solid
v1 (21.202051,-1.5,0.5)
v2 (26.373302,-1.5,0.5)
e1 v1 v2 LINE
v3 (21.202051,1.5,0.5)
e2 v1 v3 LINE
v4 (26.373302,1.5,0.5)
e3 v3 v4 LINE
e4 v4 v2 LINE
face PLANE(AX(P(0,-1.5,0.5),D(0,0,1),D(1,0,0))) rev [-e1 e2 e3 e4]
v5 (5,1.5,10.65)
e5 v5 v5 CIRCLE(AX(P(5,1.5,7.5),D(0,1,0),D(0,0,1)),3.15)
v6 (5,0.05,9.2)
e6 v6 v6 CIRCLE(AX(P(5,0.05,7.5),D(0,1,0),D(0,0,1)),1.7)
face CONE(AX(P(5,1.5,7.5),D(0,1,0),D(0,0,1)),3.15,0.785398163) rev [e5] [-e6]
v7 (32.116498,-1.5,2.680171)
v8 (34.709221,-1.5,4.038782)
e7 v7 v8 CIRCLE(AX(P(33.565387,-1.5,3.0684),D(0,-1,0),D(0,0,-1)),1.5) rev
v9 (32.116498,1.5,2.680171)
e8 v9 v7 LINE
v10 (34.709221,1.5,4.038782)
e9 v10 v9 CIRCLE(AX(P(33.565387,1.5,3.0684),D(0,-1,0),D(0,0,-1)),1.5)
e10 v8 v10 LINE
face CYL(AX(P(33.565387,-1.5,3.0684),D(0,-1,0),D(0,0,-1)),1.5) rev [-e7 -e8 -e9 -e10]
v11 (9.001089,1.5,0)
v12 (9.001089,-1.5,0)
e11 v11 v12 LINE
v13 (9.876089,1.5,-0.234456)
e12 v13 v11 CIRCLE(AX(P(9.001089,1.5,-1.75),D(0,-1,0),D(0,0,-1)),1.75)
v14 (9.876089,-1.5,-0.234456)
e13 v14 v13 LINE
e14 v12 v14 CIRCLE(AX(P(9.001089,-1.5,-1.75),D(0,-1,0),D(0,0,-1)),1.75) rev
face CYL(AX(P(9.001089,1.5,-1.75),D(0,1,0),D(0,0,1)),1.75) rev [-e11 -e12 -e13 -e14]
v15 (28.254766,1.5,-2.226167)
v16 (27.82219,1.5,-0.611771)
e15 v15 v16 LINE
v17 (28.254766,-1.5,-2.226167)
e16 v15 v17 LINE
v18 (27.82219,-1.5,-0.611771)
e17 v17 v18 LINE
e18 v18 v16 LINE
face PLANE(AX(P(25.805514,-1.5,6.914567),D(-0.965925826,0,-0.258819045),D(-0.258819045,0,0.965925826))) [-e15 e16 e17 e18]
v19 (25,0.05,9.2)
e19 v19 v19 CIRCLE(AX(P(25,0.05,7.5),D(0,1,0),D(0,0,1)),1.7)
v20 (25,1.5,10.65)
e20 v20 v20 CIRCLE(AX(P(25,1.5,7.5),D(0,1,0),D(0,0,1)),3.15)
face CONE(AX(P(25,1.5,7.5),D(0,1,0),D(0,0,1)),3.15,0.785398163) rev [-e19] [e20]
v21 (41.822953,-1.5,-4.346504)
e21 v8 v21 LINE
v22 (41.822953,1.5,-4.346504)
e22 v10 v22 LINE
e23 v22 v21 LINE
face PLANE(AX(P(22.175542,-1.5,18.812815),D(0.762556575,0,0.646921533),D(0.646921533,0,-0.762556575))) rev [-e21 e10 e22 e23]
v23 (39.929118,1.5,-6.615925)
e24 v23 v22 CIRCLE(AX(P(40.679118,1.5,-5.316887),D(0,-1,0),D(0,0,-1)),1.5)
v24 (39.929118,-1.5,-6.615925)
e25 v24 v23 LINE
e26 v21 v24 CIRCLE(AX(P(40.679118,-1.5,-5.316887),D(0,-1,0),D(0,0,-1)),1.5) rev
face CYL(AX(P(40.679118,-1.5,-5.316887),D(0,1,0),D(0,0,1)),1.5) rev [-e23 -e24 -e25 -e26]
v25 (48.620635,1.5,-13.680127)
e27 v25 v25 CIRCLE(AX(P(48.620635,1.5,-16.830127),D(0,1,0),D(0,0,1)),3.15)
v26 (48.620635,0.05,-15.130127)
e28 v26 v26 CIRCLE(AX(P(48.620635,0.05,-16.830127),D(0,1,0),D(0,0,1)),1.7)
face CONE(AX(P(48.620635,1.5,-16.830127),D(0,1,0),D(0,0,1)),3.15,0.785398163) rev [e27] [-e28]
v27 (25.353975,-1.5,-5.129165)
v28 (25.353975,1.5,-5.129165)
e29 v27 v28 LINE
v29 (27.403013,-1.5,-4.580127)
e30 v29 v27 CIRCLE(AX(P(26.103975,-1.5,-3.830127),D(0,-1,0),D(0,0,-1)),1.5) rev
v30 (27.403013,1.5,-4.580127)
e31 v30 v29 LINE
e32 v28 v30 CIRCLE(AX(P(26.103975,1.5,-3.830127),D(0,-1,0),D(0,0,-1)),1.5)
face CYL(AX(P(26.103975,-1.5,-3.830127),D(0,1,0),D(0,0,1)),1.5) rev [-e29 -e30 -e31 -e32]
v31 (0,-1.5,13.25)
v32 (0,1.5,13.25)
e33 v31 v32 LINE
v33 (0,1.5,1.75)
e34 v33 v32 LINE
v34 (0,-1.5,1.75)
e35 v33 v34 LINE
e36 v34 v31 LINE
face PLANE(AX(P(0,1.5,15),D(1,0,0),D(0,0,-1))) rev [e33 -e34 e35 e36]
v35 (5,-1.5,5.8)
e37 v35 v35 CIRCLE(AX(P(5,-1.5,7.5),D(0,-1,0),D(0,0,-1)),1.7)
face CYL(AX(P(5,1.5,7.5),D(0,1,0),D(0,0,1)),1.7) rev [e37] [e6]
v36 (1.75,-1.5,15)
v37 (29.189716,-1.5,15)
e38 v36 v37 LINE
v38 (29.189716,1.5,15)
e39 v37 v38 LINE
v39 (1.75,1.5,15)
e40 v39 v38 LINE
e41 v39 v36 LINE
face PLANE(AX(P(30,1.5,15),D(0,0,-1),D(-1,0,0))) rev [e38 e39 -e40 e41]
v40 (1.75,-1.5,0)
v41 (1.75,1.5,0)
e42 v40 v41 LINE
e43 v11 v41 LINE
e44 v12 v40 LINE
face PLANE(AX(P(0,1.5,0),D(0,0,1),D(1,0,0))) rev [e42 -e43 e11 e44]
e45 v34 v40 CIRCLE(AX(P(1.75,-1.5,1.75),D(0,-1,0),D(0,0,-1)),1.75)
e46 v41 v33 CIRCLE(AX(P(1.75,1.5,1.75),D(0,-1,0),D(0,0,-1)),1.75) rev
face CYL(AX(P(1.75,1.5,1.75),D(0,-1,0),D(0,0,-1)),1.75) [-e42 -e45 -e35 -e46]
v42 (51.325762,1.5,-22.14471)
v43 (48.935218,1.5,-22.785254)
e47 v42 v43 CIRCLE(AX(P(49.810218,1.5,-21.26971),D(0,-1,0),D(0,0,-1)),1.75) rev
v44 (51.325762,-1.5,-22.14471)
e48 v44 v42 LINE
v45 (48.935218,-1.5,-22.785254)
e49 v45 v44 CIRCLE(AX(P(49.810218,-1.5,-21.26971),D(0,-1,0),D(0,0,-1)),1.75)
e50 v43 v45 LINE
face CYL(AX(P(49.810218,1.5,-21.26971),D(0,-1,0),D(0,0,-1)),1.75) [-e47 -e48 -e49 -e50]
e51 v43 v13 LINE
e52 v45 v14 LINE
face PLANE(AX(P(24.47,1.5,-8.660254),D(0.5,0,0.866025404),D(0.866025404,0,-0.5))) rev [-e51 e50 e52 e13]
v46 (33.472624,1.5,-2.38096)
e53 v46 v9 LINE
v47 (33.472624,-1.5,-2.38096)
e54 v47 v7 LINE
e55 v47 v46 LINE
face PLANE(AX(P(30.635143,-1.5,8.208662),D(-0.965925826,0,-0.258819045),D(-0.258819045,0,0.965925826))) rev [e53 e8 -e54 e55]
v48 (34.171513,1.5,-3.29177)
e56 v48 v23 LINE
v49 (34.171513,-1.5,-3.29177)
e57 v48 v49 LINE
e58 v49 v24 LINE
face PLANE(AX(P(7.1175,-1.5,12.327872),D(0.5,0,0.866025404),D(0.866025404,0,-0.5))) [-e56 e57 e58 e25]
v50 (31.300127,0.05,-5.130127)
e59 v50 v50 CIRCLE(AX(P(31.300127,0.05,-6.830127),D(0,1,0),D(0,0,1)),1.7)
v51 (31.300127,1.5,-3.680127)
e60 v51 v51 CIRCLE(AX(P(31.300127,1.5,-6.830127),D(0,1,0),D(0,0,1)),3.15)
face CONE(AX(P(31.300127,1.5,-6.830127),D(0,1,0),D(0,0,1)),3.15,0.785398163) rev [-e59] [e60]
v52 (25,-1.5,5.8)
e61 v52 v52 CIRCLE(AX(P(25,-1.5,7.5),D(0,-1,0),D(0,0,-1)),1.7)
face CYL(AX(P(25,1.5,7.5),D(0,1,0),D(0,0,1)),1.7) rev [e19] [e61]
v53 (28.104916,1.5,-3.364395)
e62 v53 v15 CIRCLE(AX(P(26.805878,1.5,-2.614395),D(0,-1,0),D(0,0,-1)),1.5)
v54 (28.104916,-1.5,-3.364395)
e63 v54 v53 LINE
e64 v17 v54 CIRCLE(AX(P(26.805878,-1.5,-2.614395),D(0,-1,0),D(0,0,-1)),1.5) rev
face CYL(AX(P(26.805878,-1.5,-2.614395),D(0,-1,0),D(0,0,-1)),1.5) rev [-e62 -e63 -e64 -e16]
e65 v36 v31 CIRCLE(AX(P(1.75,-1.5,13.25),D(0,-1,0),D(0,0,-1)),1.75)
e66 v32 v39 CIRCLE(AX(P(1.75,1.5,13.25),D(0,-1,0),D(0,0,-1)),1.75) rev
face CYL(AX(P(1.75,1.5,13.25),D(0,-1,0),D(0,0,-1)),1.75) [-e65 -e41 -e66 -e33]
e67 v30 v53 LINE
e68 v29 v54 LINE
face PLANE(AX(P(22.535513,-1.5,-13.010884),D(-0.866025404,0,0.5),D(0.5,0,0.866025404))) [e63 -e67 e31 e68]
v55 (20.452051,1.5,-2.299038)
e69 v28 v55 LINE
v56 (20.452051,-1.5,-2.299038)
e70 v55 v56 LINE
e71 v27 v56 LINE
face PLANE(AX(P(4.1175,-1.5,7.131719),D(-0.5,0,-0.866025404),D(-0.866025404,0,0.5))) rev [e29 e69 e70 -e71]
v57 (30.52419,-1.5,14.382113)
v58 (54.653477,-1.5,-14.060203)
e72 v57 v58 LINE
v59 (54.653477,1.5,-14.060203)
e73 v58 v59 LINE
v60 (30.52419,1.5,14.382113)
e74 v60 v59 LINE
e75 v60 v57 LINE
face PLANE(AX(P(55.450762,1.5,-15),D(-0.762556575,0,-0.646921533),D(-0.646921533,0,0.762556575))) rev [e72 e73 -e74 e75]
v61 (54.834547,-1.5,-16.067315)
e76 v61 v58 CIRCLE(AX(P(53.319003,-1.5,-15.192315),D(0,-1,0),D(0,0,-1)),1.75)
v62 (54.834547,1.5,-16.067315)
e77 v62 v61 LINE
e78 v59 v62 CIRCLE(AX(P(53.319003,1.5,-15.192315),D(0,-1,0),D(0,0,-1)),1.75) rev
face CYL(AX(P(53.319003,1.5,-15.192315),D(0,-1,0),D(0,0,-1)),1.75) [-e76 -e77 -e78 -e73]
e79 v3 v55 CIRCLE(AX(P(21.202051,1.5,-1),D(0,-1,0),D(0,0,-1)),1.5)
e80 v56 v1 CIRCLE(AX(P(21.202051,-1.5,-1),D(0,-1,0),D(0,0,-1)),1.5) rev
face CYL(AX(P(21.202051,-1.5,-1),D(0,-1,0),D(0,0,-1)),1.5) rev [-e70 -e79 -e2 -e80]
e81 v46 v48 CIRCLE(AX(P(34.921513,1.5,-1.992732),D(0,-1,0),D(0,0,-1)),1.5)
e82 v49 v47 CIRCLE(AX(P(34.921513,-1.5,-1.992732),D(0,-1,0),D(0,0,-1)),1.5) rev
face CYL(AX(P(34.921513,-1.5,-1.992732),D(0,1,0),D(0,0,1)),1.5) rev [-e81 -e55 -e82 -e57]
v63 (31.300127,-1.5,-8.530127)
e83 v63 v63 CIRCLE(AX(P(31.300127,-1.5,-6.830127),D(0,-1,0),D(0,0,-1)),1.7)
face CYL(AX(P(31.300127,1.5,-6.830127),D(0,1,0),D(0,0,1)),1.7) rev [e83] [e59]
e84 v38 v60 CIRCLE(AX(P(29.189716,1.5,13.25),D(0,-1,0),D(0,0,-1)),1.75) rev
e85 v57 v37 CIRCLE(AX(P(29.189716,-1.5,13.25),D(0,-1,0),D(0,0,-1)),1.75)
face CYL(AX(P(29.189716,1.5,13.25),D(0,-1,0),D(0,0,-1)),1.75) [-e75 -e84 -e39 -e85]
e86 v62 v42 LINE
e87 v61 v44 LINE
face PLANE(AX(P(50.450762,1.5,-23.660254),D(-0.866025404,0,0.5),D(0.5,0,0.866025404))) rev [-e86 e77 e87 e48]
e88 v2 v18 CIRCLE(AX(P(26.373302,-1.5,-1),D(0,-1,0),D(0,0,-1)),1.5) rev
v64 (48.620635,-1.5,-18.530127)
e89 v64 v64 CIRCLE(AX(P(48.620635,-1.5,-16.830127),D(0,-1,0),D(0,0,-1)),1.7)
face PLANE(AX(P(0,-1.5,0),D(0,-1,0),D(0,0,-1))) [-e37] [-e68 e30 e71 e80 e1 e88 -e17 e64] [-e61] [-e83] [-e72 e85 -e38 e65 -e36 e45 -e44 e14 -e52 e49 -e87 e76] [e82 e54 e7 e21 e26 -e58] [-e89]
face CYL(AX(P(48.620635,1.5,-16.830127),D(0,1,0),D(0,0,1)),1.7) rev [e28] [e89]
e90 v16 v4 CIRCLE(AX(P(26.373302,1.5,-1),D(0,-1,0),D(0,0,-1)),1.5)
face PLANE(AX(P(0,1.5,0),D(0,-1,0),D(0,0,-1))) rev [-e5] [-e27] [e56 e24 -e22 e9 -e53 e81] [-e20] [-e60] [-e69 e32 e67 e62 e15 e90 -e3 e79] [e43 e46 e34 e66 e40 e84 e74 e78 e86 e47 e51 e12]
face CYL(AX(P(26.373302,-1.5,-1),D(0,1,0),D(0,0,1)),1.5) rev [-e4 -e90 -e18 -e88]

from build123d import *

# Parameters (mm, degrees)
SKETCH_2_R                   = 1.6
EXTRUDE_1_DEPTH              = 1.5
CUT_EXTRUDE_1_DEPTH          = 3
FILLET_1_R                   = 1
FILLET_2_R                   = 1.75
HOLE_WIZARD_M3_1_D           = 3.4
HOLE_WIZARD_M3_1_DEPTH       = 18.978536948
HOLE_WIZARD_M3_1_CSINK_D     = 6.3
HOLE_WIZARD_M3_1_CSINK_ANGLE = 90
HOLE_WIZARD_M3_1_TIP         = 1.021463052
MOVE_START                   = -1.5
MOVE_FACE_1_DEPTH            = 3


# Read off the part's stored shape, not the designer's step: 面の移動1
with BuildPart() as part:
    # ｽｹｯﾁ2 → ﾎﾞｽ - 押し出し1 (new, symmetric)
    with BuildSketch(Plane(origin=(0, 0, 0), x_dir=(1, 0, 0), z_dir=(0, 1, 0))):
        Polygon((24.47, 8.660254038), (9.47, 0), (0, 0), (0, -15), (30, -15), (55.450762114, 15), (50.450762114, 23.660254038), align=None)
        with Locations(Location((48.620635095, 16.830127019, 0), (0, 0, 270))):
            Circle(SKETCH_2_R, mode=Mode.SUBTRACT)
        with Locations(Location((25, -7.5, 0), (0, 0, 270))):
            Circle(SKETCH_2_R, mode=Mode.SUBTRACT)
        with Locations(Location((31.300127019, 6.830127019, 0), (0, 0, 270))):
            Circle(SKETCH_2_R, mode=Mode.SUBTRACT)
        with Locations(Location((5, -7.5, 0), (0, 0, 270))):
            Circle(SKETCH_2_R, mode=Mode.SUBTRACT)
    extrude(amount=EXTRUDE_1_DEPTH, both=True)

    # ｽｹｯﾁ3 → ｶｯﾄ - 押し出し1 (cut)
    with BuildSketch(Plane(origin=(0, 1.5, 0), x_dir=(1, 0, 0), z_dir=(0, 1, 0))):
        Polygon((26.47, 5.196152423), (17.47, 0), (27.140628594, 0), (27.879009742, 2.755675961), align=None)
        Polygon((33.352285677, 0), (37.479868618, 0), (45.169472556, 9.064094706), (34.062793268, 2.651650429), align=None)
        Polygon((31.44676478, -7.111500799), (37.479868618, 0), (33.352285677, 0), align=None)
    extrude(amount=-CUT_EXTRUDE_1_DEPTH, mode=Mode.SUBTRACT)

    # ﾌｨﾚｯﾄ1
    fillet_1_edges = [part.edges().sort_by_distance(p)[0] for p in [
        (27.879009742, 0, -2.755675961),
        (27.140628594, 0, 0),
        (17.47, 0, 0),
        (26.47, 0, -5.196152423),
        (34.062793268, 0, -2.651650429),
        (45.169472556, 0, -9.064094706),
        (31.44676478, 0, 7.111500799),
    ]]
    fillet(fillet_1_edges, radius=FILLET_1_R)

    # ﾌｨﾚｯﾄ2
    fillet_2_edges = [part.edges().sort_by_distance(p)[0] for p in [
        (50.450762114, 0, -23.660254038),
        (55.450762114, 0, -15),
        (30, 0, 15),
        (0, 0, 15),
        (0, 0, 0),
        (9.47, 0, 0),
    ]]
    fillet(fillet_2_edges, radius=FILLET_2_R)

    # M3 丸皿ねじ用皿穴1
    with Locations(Plane(origin=(5, 1.5, 7.5), x_dir=(0, 0, 1), z_dir=(0, 1, 0))):
        with Locations((0, 0), (0, 20), (-14.330127019, 26.300127019), (-24.330127019, 43.620635095)):
            CounterSinkHole(HOLE_WIZARD_M3_1_D / 2, HOLE_WIZARD_M3_1_CSINK_D / 2, depth=HOLE_WIZARD_M3_1_DEPTH, counter_sink_angle=HOLE_WIZARD_M3_1_CSINK_ANGLE)
            with Locations((0, 0, -(HOLE_WIZARD_M3_1_DEPTH + HOLE_WIZARD_M3_1_TIP / 2))):  # 118° drill point
                Cone(0, HOLE_WIZARD_M3_1_D / 2, HOLE_WIZARD_M3_1_TIP, mode=Mode.SUBTRACT)

    # Move Face 1 outline → Move Face 1 (cut)
    # profile 1 of 2: a face of its own
    with BuildSketch(Plane(origin=(0, 0, 0), x_dir=(1, 0, 0), z_dir=(0, 1, 0)).offset(MOVE_START)):
        with BuildLine():
            Line((39.92911769, 6.615924683), (34.171512735, 3.291769913))
            ThreePointArc((34.171512735, 3.291769913), (33.731482725, 2.90587395), (33.472623996, 2.380960375))
            Line((33.472623996, 2.380960375), (32.116497814, -2.680171439))
            ThreePointArc((32.116497814, -2.680171439), (32.869167953, -4.39703828), (34.709221416, -4.038782306))
            Line((34.709221416, -4.038782306), (41.822952552, 4.346504278))
            ThreePointArc((41.822952552, 4.346504278), (41.830787659, 6.27795696), (39.92911769, 6.615924683))
        make_face()
        with BuildLine():
            ThreePointArc((33.955586909, 2.251550852), (34.128159395, 2.601493236), (34.421512735, 2.858757211))
            Line((34.421512735, 2.858757211), (40.17911769, 6.182911981))
            ThreePointArc((40.17911769, 6.182911981), (41.44689767, 5.957600166), (41.441674265, 4.669965044))
            Line((41.441674265, 4.669965044), (34.327943128, -3.71532154))
            ThreePointArc((34.327943128, -3.71532154), (33.10124082, -3.954158856), (32.599460727, -2.809580962))
            Line((32.599460727, -2.809580962), (33.955586909, 2.251550852))
        make_face(mode=Mode.SUBTRACT)
    # profile 2 of 2: a face of its own
    with BuildSketch(Plane(origin=(0, 0, 0), x_dir=(1, 0, 0), z_dir=(0, 1, 0)).offset(MOVE_START)):
        with BuildLine():
            Line((27.822190346, 0.611771432), (28.254766297, 2.226166861))
            ThreePointArc((28.254766297, 2.226166861), (28.293044849, 2.810184717), (28.104915663, 3.364395428))
            Line((28.104915663, 3.364395428), (27.403012702, 4.580127019))
            ThreePointArc((27.403012702, 4.580127019), (26.492203164, 5.279015758), (25.353974596, 5.129165125))
            Line((25.353974596, 5.129165125), (20.452050808, 2.299038106))
            ThreePointArc((20.452050808, 2.299038106), (19.753162068, 0.611771432), (21.202050808, -0.5))
            Line((21.202050808, -0.5), (26.373301606, -0.5))
            ThreePointArc((26.373301606, -0.5), (27.286443749, -0.19003001), (27.822190346, 0.611771432))
        make_face()
        with BuildLine():
            Line((26.373301606, 0), (21.202050808, 0))
            ThreePointArc((21.202050808, 0), (20.236124981, 0.741180955), (20.702050808, 1.866025404))
            Line((20.702050808, 1.866025404), (25.603974596, 4.696152423))
            ThreePointArc((25.603974596, 4.696152423), (26.362793641, 4.796052845), (26.97, 4.330127019))
            Line((26.97, 4.330127019), (27.671902961, 3.114395428))
            ThreePointArc((27.671902961, 3.114395428), (27.797322419, 2.74492162), (27.771803384, 2.355576383))
            Line((27.771803384, 2.355576383), (27.339227432, 0.741180955))
            ThreePointArc((27.339227432, 0.741180955), (26.982063035, 0.20664666), (26.373301606, 0))
        make_face(mode=Mode.SUBTRACT)
    extrude(amount=MOVE_FACE_1_DEPTH, mode=Mode.SUBTRACT)


solid = part.part
